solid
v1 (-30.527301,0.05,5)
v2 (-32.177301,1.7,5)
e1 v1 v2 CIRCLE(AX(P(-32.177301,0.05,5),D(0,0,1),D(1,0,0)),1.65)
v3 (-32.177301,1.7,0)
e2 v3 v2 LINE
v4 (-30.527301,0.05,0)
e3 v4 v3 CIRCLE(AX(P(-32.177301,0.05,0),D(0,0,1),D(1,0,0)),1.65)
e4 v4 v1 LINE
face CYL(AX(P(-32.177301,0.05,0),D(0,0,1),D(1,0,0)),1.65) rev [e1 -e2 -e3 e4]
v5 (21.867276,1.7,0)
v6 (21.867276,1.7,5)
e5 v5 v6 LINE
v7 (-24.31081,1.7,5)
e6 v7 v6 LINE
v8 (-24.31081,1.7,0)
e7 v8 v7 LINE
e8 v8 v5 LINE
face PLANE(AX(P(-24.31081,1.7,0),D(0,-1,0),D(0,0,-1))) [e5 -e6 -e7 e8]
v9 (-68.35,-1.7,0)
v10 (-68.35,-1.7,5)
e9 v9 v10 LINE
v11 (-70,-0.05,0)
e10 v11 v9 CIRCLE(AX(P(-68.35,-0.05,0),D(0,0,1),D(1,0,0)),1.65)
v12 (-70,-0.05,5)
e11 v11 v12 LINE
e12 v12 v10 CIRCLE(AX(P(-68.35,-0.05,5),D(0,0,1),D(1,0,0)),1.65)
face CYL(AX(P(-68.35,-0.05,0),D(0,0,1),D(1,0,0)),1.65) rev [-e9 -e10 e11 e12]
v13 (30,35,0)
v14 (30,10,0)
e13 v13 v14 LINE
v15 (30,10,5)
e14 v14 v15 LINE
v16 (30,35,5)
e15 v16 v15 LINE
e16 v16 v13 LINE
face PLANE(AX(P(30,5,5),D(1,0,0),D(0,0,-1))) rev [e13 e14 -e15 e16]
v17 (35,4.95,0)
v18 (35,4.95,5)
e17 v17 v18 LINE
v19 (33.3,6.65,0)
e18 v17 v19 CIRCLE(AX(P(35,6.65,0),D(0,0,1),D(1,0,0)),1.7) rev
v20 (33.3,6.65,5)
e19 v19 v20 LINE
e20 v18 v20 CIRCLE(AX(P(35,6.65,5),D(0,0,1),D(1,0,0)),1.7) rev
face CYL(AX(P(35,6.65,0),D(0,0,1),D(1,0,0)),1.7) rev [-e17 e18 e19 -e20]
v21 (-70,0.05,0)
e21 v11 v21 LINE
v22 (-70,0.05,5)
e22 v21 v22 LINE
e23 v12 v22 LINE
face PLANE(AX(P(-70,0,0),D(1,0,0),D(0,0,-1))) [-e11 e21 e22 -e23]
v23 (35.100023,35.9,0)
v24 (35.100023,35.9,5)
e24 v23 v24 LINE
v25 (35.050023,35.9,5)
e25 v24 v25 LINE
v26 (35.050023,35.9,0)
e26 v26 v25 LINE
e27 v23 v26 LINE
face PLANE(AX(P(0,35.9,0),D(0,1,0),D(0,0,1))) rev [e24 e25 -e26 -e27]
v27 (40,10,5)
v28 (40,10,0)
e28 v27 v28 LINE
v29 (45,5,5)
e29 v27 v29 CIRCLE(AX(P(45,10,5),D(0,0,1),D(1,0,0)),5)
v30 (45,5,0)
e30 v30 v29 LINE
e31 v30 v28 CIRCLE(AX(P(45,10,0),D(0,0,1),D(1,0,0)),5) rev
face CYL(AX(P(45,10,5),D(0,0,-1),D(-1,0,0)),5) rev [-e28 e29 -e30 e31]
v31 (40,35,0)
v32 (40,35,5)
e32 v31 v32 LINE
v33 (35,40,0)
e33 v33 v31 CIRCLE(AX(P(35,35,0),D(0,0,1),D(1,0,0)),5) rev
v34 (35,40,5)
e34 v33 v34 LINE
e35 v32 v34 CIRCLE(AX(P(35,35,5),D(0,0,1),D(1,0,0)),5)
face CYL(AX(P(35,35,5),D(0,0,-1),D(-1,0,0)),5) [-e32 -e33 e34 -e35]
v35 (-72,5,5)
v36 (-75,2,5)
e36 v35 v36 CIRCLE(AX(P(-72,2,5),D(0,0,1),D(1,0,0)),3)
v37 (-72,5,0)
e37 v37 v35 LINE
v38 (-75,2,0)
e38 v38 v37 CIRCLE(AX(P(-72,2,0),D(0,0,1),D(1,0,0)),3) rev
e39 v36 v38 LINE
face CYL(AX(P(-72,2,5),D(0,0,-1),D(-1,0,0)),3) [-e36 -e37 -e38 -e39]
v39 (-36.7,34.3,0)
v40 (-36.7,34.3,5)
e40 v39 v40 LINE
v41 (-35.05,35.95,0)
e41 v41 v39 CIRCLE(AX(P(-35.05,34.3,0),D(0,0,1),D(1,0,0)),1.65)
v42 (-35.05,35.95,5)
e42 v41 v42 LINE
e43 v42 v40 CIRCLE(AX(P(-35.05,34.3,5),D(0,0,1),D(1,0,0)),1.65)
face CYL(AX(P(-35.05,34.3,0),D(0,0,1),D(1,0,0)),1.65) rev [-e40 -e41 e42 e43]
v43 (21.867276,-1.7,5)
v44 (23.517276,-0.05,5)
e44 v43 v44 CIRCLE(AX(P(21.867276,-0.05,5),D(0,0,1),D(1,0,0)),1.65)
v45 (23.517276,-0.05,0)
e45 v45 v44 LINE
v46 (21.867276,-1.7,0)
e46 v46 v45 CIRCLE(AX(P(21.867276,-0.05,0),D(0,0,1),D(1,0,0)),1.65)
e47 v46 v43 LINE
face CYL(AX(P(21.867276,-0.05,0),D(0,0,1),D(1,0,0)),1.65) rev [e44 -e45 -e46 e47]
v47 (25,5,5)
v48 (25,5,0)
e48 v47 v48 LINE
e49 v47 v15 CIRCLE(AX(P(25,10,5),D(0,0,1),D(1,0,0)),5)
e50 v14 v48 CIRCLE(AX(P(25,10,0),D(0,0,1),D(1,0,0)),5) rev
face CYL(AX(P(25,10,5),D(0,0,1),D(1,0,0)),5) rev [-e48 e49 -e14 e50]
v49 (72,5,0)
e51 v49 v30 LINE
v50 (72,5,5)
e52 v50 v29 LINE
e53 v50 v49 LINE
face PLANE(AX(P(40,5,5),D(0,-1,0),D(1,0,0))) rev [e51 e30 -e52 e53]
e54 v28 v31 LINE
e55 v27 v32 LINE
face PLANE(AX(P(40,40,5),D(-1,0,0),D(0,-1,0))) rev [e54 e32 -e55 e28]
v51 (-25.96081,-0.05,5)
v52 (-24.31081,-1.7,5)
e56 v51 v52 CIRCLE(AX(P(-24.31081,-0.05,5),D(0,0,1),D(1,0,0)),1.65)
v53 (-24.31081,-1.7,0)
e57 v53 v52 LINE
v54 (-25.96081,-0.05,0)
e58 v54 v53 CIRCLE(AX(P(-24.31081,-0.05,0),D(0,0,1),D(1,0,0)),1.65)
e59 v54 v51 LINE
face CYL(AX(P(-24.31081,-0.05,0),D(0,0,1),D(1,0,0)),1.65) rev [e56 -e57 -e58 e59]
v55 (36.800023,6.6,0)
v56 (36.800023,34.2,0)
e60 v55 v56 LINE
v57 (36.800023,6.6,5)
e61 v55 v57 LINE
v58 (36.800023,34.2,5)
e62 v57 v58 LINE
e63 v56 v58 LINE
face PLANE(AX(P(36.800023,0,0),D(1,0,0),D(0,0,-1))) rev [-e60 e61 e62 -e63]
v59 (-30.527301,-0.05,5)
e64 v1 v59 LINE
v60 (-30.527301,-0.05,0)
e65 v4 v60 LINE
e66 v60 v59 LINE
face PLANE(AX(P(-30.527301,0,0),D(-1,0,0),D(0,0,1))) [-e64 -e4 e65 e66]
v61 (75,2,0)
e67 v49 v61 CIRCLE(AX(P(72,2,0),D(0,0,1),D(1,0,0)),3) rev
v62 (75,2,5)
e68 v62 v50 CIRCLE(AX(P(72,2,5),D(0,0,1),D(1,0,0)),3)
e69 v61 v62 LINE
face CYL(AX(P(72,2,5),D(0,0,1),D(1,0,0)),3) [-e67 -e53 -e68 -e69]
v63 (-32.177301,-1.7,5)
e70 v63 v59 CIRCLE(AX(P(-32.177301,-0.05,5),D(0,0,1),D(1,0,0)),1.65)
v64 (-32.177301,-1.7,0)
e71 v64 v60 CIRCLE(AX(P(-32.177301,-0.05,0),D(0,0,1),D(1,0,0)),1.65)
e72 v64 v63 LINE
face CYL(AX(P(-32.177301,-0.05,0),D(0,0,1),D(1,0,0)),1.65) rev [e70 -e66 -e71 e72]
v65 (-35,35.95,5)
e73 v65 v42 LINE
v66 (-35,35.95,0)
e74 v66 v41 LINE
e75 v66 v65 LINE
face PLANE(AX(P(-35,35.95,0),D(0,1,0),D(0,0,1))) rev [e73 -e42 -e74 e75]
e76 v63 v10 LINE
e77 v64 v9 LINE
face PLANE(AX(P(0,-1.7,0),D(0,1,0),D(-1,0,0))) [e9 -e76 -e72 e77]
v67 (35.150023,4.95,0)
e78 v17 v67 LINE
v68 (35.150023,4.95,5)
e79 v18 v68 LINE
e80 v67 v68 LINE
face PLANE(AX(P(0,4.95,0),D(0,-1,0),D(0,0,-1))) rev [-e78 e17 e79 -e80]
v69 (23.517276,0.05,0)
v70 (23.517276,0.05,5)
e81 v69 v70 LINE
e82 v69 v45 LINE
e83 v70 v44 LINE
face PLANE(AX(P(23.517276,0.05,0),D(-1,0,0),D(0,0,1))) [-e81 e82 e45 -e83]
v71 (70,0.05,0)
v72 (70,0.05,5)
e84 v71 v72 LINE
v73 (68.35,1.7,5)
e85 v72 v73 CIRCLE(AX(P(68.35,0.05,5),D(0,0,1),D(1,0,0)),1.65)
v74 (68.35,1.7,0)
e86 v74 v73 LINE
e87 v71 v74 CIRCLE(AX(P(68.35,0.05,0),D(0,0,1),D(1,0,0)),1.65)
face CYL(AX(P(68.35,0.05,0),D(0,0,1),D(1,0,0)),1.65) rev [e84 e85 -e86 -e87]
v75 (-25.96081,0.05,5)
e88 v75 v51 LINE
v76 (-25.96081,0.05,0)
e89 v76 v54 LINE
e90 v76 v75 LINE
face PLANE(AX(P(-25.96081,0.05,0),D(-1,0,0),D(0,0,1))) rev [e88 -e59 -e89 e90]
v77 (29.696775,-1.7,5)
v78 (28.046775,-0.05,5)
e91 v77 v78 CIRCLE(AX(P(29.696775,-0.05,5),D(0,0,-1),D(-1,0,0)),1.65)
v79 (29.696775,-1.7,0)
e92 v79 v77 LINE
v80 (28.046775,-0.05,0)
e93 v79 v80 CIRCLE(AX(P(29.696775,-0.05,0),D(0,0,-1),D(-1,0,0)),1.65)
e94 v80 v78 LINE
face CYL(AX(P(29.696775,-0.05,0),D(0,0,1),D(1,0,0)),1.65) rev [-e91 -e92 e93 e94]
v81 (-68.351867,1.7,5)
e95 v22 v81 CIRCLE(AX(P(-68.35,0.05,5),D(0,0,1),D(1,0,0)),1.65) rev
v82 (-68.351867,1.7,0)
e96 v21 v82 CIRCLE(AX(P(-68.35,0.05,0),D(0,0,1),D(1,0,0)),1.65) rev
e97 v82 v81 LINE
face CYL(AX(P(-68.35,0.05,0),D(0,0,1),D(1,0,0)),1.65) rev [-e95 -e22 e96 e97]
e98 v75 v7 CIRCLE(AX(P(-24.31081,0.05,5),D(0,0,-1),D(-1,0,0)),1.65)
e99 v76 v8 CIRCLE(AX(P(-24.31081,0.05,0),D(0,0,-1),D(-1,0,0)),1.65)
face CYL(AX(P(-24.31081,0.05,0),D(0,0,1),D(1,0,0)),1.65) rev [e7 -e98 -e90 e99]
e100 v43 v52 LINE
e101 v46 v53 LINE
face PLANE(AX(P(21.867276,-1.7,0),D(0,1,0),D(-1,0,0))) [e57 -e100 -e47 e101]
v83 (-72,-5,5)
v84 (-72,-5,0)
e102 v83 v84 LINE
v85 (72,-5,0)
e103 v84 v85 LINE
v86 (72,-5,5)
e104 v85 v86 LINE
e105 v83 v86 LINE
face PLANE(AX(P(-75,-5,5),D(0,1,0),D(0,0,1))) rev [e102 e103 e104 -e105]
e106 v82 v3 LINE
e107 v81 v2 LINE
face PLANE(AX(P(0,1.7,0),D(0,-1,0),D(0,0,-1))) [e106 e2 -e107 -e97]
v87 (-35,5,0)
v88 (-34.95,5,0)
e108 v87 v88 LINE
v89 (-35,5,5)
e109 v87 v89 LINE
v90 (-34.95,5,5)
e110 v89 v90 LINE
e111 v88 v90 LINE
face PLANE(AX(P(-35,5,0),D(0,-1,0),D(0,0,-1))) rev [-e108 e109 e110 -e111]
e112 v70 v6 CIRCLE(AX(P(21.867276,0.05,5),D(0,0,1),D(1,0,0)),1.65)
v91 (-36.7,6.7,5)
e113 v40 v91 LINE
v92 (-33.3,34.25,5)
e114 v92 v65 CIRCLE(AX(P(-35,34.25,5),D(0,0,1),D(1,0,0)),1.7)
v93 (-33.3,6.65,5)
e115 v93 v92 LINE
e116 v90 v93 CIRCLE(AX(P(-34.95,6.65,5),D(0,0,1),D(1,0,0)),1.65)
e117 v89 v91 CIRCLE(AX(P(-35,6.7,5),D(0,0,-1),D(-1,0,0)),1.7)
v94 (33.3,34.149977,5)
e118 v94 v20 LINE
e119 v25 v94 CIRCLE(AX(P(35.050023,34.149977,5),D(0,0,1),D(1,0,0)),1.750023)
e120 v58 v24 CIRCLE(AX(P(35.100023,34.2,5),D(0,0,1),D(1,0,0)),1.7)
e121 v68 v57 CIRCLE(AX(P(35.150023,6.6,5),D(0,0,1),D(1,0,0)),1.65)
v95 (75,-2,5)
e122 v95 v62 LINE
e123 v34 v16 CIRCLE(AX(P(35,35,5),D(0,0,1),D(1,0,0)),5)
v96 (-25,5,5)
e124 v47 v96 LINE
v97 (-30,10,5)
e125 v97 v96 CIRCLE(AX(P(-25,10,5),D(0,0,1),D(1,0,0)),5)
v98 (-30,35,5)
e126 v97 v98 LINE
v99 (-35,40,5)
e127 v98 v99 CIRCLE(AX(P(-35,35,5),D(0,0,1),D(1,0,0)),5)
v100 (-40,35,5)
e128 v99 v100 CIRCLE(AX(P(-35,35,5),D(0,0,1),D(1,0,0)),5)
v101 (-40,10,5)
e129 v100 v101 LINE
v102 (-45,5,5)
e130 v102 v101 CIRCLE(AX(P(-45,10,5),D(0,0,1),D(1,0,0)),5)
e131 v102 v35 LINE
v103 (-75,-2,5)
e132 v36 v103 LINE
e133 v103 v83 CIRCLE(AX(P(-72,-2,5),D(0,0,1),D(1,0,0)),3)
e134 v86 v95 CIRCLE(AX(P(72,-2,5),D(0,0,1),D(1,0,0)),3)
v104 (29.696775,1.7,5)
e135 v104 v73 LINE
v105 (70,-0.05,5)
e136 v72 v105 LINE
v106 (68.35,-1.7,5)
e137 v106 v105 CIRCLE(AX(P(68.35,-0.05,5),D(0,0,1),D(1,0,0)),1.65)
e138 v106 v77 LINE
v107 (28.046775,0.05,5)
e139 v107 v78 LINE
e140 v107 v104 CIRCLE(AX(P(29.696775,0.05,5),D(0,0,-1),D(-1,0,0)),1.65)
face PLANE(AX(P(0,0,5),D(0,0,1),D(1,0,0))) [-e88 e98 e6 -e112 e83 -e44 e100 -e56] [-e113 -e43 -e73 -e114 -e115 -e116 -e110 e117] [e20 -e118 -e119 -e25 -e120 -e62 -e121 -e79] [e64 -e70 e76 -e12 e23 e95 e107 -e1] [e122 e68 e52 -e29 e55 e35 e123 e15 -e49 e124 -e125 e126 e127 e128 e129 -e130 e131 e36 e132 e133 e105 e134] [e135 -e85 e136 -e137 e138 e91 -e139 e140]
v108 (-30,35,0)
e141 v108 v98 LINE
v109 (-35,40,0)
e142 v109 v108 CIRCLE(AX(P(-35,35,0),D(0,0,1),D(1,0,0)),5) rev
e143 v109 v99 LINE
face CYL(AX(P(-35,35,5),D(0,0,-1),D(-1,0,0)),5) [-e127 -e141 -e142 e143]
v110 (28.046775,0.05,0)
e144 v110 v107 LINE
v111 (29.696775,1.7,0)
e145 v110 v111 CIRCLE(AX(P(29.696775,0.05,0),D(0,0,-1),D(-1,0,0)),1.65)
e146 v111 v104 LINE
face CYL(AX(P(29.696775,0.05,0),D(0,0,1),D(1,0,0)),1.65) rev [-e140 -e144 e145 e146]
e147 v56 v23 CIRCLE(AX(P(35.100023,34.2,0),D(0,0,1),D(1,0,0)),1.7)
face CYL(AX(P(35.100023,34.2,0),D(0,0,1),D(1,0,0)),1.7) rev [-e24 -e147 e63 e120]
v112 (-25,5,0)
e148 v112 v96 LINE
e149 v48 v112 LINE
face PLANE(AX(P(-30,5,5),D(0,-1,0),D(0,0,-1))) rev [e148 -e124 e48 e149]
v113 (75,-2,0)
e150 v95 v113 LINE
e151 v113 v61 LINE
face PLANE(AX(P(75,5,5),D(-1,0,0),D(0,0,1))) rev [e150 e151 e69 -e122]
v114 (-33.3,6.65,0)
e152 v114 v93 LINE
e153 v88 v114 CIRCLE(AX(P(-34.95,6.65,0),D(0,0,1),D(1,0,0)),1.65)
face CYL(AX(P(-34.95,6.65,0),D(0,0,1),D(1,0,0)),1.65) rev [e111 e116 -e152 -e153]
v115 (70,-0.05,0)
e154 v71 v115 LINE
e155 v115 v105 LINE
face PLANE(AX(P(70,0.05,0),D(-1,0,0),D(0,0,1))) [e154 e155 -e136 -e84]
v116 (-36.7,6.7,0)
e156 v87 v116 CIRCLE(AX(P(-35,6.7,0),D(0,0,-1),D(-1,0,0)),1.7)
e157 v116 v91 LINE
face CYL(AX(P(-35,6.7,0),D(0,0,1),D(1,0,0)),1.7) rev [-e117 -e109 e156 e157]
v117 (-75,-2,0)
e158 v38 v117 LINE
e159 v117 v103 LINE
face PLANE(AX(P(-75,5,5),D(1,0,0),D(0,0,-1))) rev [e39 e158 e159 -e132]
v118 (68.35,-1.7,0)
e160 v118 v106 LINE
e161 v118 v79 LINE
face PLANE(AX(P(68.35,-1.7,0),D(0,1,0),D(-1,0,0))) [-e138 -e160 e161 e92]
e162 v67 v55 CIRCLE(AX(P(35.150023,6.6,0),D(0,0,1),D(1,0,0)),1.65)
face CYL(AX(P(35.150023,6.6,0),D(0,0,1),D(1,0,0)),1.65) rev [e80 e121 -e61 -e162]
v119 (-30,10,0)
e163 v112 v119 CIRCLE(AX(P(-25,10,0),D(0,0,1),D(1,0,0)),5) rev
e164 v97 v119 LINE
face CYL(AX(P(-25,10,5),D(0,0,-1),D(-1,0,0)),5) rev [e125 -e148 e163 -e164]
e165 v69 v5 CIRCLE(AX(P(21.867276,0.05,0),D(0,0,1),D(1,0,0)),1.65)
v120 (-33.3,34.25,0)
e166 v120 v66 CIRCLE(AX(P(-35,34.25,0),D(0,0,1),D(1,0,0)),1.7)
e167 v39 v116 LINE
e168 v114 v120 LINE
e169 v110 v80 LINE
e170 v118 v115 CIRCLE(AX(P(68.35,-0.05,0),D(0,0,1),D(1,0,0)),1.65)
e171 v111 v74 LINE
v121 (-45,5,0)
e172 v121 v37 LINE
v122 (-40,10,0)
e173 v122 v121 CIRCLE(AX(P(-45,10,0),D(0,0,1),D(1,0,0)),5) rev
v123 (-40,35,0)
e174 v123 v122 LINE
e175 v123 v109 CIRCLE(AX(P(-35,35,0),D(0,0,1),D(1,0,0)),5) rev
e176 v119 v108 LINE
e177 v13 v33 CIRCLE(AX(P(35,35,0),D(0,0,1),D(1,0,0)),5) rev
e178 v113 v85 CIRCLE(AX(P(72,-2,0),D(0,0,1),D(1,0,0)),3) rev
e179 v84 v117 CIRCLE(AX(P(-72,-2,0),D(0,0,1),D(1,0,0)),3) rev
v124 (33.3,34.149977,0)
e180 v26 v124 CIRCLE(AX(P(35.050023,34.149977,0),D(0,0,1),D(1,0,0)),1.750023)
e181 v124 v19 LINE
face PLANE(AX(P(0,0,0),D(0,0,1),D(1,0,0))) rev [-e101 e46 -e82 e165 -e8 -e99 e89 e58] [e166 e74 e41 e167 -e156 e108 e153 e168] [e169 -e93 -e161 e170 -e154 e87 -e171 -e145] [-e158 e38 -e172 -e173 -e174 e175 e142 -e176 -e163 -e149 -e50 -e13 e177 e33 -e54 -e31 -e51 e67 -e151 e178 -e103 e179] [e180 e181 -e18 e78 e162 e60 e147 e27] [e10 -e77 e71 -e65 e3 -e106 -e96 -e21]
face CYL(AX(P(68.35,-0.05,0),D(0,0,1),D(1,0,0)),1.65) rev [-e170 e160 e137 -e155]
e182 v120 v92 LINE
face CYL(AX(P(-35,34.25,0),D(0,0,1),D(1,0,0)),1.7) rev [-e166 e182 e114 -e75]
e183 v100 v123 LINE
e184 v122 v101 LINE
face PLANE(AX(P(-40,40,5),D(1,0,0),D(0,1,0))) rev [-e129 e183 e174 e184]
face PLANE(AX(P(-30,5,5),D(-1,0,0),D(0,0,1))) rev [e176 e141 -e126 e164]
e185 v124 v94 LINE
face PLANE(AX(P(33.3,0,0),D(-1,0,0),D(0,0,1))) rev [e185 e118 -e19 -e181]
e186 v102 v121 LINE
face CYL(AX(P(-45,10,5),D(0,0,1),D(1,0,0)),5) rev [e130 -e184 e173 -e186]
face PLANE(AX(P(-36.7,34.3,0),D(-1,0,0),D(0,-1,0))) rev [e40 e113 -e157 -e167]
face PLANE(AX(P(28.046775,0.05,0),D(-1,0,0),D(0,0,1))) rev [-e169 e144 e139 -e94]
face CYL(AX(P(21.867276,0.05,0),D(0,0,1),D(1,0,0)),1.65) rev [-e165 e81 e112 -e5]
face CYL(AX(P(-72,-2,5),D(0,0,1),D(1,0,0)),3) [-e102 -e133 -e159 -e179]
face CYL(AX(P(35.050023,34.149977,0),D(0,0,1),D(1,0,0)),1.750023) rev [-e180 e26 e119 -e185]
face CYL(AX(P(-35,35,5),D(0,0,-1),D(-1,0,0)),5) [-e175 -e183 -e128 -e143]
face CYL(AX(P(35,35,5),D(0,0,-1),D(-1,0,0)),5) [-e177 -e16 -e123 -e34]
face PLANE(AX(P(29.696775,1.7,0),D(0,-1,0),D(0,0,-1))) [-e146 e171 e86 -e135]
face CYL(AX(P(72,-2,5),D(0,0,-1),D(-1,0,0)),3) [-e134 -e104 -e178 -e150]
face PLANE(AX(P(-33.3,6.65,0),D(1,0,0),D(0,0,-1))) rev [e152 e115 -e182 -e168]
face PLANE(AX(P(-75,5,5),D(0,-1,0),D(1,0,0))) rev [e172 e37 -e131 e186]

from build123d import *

# Parameters (mm, degrees)
EXTRUDE_1_DEPTH     = 5
FILLET_4_R          = 5
FILLET_5_R          = 5
FILLET_6_R          = 5
FILLET_7_R          = 5
FILLET_8_R          = 3
FILLET_9_R          = 3
FILLET_10_R         = 3
FILLET_11_R         = 3
FILLET_12_R         = 5
FILLET_13_R         = 5
FILLET_14_R         = 5
FILLET_15_R         = 5
CUT_EXTRUDE_START   = -5
CUT_EXTRUDE_2_DEPTH = 5


# Read off the part's stored shape, not the designer's step: 切除-拉伸2
with BuildPart() as part:
    # 草图1 → 凸台-拉伸1 (new body)
    with BuildSketch(Plane.XY):
        Polygon((-75, 5), (-40, 5), (-40, 40), (-30, 40), (-30, 5), (30, 5), (30, 40), (40, 40), (40, 5), (75, 5), (75, -5), (-75, -5), align=None)
    extrude(amount=EXTRUDE_1_DEPTH)

    # 圆角4
    fillet_4_edges = [part.edges().sort_by_distance(p)[0] for p in [
        (-40, 40, 2.5),
    ]]
    fillet(fillet_4_edges, radius=FILLET_4_R)

    # 圆角5
    fillet_5_edges = [part.edges().sort_by_distance(p)[0] for p in [
        (-30, 40, 2.5),
    ]]
    fillet(fillet_5_edges, radius=FILLET_5_R - 0.0001)  # a hair under: the kernel refuses the full size

    # 圆角6
    fillet_6_edges = [part.edges().sort_by_distance(p)[0] for p in [
        (30, 40, 2.5),
    ]]
    fillet(fillet_6_edges, radius=FILLET_6_R)

    # 圆角7
    fillet_7_edges = [part.edges().sort_by_distance(p)[0] for p in [
        (40, 40, 2.5),
    ]]
    fillet(fillet_7_edges, radius=FILLET_7_R - 0.0001)  # a hair under: the kernel refuses the full size

    # 圆角8
    fillet_8_edges = [part.edges().sort_by_distance(p)[0] for p in [
        (-75, 5, 2.5),
    ]]
    fillet(fillet_8_edges, radius=FILLET_8_R)

    # 圆角9
    fillet_9_edges = [part.edges().sort_by_distance(p)[0] for p in [
        (-75, -5, 2.5),
    ]]
    fillet(fillet_9_edges, radius=FILLET_9_R)

    # 圆角10
    fillet_10_edges = [part.edges().sort_by_distance(p)[0] for p in [
        (75, 5, 2.5),
    ]]
    fillet(fillet_10_edges, radius=FILLET_10_R)

    # 圆角11
    fillet_11_edges = [part.edges().sort_by_distance(p)[0] for p in [
        (75, -5, 2.5),
    ]]
    fillet(fillet_11_edges, radius=FILLET_11_R)

    # 圆角12
    fillet_12_edges = [part.edges().sort_by_distance(p)[0] for p in [
        (40, 5, 2.5),
    ]]
    fillet(fillet_12_edges, radius=FILLET_12_R)

    # 圆角13
    fillet_13_edges = [part.edges().sort_by_distance(p)[0] for p in [
        (30, 5, 2.5),
    ]]
    fillet(fillet_13_edges, radius=FILLET_13_R)

    # 圆角14
    fillet_14_edges = [part.edges().sort_by_distance(p)[0] for p in [
        (-30, 5, 2.5),
    ]]
    fillet(fillet_14_edges, radius=FILLET_14_R)

    # 圆角15
    fillet_15_edges = [part.edges().sort_by_distance(p)[0] for p in [
        (-40, 5, 2.5),
    ]]
    fillet(fillet_15_edges, radius=FILLET_15_R)

    # 切除-拉伸2 outline → 切除-拉伸2 (cut)
    with BuildSketch(Plane.XY.offset(5).offset(CUT_EXTRUDE_START)):
        with BuildLine():
            ThreePointArc((-36.7, 6.7), (-36.202081528, 5.497918472), (-35, 5))
            Line((-35, 5), (-34.95, 5))
            ThreePointArc((-34.95, 5), (-33.783273811, 5.483273811), (-33.3, 6.65))
            Line((-33.3, 6.65), (-33.3, 34.25))
            ThreePointArc((-33.3, 34.25), (-33.797918472, 35.452081528), (-35, 35.95))
            Line((-35, 35.95), (-35.05, 35.95))
            ThreePointArc((-35.05, 35.95), (-36.216726189, 35.466726189), (-36.7, 34.3))
            Line((-36.7, 34.3), (-36.7, 6.7))
        make_face()
        with BuildLine():
            Line((-30.527301477, -0.05), (-30.527301477, 0.05))
            ThreePointArc((-30.527301477, 0.05), (-31.010575288, 1.216726189), (-32.177301477, 1.7))
            Line((-32.177301477, 1.7), (-68.351867054, 1.699998944))
            ThreePointArc((-68.351867054, 1.699998944), (-69.517386106, 1.216065899), (-70, 0.05))
            Line((-70, 0.05), (-70, -0.05))
            ThreePointArc((-70, -0.05), (-69.516726189, -1.216726189), (-68.35, -1.7))
            Line((-68.35, -1.7), (-32.177301477, -1.7))
            ThreePointArc((-32.177301477, -1.7), (-31.010575288, -1.216726189), (-30.527301477, -0.05))
        make_face()
        with BuildLine():
            Line((-24.310810244, -1.7), (21.867276161, -1.7))
            ThreePointArc((21.867276161, -1.7), (23.03400235, -1.216726189), (23.517276161, -0.05))
            Line((23.517276161, -0.05), (23.517276161, 0.05))
            ThreePointArc((23.517276161, 0.05), (23.03400235, 1.216726189), (21.867276161, 1.7))
            Line((21.867276161, 1.7), (-24.310810244, 1.7))
            ThreePointArc((-24.310810244, 1.7), (-25.477536433, 1.216726189), (-25.960810244, 0.05))
            Line((-25.960810244, 0.05), (-25.960810244, -0.05))
            ThreePointArc((-25.960810244, -0.05), (-25.477536433, -1.216726189), (-24.310810244, -1.7))
        make_face()
        with BuildLine():
            Line((29.696775282, -1.7), (68.35, -1.7))
            ThreePointArc((68.35, -1.7), (69.516726189, -1.216726189), (70, -0.05))
            Line((70, -0.05), (70, 0.05))
            ThreePointArc((70, 0.05), (69.516726189, 1.216726189), (68.35, 1.7))
            Line((68.35, 1.7), (29.696775282, 1.7))
            ThreePointArc((29.696775282, 1.7), (28.530049093, 1.216726189), (28.046775282, 0.05))
            Line((28.046775282, 0.05), (28.046775282, -0.05))
            ThreePointArc((28.046775282, -0.05), (28.530049093, -1.216726189), (29.696775282, -1.7))
        make_face()
        with BuildLine():
            ThreePointArc((36.800022997, 34.2), (36.302104525, 35.402081528), (35.100022997, 35.9))
            Line((35.100022997, 35.9), (35.050022997, 35.9))
            ThreePointArc((35.050022997, 35.9), (33.812569868, 35.387430132), (33.3, 34.149977003))
            Line((33.3, 34.149977003), (33.3, 6.65))
            ThreePointArc((33.3, 6.65), (33.797918472, 5.447918472), (35, 4.95))
            Line((35, 4.95), (35.150022997, 4.95))
            ThreePointArc((35.150022997, 4.95), (36.316749186, 5.433273812), (36.800022997, 6.6))
            Line((36.800022997, 6.6), (36.800022997, 34.2))
        make_face()
    extrude(amount=CUT_EXTRUDE_2_DEPTH, mode=Mode.SUBTRACT)


solid = part.part
